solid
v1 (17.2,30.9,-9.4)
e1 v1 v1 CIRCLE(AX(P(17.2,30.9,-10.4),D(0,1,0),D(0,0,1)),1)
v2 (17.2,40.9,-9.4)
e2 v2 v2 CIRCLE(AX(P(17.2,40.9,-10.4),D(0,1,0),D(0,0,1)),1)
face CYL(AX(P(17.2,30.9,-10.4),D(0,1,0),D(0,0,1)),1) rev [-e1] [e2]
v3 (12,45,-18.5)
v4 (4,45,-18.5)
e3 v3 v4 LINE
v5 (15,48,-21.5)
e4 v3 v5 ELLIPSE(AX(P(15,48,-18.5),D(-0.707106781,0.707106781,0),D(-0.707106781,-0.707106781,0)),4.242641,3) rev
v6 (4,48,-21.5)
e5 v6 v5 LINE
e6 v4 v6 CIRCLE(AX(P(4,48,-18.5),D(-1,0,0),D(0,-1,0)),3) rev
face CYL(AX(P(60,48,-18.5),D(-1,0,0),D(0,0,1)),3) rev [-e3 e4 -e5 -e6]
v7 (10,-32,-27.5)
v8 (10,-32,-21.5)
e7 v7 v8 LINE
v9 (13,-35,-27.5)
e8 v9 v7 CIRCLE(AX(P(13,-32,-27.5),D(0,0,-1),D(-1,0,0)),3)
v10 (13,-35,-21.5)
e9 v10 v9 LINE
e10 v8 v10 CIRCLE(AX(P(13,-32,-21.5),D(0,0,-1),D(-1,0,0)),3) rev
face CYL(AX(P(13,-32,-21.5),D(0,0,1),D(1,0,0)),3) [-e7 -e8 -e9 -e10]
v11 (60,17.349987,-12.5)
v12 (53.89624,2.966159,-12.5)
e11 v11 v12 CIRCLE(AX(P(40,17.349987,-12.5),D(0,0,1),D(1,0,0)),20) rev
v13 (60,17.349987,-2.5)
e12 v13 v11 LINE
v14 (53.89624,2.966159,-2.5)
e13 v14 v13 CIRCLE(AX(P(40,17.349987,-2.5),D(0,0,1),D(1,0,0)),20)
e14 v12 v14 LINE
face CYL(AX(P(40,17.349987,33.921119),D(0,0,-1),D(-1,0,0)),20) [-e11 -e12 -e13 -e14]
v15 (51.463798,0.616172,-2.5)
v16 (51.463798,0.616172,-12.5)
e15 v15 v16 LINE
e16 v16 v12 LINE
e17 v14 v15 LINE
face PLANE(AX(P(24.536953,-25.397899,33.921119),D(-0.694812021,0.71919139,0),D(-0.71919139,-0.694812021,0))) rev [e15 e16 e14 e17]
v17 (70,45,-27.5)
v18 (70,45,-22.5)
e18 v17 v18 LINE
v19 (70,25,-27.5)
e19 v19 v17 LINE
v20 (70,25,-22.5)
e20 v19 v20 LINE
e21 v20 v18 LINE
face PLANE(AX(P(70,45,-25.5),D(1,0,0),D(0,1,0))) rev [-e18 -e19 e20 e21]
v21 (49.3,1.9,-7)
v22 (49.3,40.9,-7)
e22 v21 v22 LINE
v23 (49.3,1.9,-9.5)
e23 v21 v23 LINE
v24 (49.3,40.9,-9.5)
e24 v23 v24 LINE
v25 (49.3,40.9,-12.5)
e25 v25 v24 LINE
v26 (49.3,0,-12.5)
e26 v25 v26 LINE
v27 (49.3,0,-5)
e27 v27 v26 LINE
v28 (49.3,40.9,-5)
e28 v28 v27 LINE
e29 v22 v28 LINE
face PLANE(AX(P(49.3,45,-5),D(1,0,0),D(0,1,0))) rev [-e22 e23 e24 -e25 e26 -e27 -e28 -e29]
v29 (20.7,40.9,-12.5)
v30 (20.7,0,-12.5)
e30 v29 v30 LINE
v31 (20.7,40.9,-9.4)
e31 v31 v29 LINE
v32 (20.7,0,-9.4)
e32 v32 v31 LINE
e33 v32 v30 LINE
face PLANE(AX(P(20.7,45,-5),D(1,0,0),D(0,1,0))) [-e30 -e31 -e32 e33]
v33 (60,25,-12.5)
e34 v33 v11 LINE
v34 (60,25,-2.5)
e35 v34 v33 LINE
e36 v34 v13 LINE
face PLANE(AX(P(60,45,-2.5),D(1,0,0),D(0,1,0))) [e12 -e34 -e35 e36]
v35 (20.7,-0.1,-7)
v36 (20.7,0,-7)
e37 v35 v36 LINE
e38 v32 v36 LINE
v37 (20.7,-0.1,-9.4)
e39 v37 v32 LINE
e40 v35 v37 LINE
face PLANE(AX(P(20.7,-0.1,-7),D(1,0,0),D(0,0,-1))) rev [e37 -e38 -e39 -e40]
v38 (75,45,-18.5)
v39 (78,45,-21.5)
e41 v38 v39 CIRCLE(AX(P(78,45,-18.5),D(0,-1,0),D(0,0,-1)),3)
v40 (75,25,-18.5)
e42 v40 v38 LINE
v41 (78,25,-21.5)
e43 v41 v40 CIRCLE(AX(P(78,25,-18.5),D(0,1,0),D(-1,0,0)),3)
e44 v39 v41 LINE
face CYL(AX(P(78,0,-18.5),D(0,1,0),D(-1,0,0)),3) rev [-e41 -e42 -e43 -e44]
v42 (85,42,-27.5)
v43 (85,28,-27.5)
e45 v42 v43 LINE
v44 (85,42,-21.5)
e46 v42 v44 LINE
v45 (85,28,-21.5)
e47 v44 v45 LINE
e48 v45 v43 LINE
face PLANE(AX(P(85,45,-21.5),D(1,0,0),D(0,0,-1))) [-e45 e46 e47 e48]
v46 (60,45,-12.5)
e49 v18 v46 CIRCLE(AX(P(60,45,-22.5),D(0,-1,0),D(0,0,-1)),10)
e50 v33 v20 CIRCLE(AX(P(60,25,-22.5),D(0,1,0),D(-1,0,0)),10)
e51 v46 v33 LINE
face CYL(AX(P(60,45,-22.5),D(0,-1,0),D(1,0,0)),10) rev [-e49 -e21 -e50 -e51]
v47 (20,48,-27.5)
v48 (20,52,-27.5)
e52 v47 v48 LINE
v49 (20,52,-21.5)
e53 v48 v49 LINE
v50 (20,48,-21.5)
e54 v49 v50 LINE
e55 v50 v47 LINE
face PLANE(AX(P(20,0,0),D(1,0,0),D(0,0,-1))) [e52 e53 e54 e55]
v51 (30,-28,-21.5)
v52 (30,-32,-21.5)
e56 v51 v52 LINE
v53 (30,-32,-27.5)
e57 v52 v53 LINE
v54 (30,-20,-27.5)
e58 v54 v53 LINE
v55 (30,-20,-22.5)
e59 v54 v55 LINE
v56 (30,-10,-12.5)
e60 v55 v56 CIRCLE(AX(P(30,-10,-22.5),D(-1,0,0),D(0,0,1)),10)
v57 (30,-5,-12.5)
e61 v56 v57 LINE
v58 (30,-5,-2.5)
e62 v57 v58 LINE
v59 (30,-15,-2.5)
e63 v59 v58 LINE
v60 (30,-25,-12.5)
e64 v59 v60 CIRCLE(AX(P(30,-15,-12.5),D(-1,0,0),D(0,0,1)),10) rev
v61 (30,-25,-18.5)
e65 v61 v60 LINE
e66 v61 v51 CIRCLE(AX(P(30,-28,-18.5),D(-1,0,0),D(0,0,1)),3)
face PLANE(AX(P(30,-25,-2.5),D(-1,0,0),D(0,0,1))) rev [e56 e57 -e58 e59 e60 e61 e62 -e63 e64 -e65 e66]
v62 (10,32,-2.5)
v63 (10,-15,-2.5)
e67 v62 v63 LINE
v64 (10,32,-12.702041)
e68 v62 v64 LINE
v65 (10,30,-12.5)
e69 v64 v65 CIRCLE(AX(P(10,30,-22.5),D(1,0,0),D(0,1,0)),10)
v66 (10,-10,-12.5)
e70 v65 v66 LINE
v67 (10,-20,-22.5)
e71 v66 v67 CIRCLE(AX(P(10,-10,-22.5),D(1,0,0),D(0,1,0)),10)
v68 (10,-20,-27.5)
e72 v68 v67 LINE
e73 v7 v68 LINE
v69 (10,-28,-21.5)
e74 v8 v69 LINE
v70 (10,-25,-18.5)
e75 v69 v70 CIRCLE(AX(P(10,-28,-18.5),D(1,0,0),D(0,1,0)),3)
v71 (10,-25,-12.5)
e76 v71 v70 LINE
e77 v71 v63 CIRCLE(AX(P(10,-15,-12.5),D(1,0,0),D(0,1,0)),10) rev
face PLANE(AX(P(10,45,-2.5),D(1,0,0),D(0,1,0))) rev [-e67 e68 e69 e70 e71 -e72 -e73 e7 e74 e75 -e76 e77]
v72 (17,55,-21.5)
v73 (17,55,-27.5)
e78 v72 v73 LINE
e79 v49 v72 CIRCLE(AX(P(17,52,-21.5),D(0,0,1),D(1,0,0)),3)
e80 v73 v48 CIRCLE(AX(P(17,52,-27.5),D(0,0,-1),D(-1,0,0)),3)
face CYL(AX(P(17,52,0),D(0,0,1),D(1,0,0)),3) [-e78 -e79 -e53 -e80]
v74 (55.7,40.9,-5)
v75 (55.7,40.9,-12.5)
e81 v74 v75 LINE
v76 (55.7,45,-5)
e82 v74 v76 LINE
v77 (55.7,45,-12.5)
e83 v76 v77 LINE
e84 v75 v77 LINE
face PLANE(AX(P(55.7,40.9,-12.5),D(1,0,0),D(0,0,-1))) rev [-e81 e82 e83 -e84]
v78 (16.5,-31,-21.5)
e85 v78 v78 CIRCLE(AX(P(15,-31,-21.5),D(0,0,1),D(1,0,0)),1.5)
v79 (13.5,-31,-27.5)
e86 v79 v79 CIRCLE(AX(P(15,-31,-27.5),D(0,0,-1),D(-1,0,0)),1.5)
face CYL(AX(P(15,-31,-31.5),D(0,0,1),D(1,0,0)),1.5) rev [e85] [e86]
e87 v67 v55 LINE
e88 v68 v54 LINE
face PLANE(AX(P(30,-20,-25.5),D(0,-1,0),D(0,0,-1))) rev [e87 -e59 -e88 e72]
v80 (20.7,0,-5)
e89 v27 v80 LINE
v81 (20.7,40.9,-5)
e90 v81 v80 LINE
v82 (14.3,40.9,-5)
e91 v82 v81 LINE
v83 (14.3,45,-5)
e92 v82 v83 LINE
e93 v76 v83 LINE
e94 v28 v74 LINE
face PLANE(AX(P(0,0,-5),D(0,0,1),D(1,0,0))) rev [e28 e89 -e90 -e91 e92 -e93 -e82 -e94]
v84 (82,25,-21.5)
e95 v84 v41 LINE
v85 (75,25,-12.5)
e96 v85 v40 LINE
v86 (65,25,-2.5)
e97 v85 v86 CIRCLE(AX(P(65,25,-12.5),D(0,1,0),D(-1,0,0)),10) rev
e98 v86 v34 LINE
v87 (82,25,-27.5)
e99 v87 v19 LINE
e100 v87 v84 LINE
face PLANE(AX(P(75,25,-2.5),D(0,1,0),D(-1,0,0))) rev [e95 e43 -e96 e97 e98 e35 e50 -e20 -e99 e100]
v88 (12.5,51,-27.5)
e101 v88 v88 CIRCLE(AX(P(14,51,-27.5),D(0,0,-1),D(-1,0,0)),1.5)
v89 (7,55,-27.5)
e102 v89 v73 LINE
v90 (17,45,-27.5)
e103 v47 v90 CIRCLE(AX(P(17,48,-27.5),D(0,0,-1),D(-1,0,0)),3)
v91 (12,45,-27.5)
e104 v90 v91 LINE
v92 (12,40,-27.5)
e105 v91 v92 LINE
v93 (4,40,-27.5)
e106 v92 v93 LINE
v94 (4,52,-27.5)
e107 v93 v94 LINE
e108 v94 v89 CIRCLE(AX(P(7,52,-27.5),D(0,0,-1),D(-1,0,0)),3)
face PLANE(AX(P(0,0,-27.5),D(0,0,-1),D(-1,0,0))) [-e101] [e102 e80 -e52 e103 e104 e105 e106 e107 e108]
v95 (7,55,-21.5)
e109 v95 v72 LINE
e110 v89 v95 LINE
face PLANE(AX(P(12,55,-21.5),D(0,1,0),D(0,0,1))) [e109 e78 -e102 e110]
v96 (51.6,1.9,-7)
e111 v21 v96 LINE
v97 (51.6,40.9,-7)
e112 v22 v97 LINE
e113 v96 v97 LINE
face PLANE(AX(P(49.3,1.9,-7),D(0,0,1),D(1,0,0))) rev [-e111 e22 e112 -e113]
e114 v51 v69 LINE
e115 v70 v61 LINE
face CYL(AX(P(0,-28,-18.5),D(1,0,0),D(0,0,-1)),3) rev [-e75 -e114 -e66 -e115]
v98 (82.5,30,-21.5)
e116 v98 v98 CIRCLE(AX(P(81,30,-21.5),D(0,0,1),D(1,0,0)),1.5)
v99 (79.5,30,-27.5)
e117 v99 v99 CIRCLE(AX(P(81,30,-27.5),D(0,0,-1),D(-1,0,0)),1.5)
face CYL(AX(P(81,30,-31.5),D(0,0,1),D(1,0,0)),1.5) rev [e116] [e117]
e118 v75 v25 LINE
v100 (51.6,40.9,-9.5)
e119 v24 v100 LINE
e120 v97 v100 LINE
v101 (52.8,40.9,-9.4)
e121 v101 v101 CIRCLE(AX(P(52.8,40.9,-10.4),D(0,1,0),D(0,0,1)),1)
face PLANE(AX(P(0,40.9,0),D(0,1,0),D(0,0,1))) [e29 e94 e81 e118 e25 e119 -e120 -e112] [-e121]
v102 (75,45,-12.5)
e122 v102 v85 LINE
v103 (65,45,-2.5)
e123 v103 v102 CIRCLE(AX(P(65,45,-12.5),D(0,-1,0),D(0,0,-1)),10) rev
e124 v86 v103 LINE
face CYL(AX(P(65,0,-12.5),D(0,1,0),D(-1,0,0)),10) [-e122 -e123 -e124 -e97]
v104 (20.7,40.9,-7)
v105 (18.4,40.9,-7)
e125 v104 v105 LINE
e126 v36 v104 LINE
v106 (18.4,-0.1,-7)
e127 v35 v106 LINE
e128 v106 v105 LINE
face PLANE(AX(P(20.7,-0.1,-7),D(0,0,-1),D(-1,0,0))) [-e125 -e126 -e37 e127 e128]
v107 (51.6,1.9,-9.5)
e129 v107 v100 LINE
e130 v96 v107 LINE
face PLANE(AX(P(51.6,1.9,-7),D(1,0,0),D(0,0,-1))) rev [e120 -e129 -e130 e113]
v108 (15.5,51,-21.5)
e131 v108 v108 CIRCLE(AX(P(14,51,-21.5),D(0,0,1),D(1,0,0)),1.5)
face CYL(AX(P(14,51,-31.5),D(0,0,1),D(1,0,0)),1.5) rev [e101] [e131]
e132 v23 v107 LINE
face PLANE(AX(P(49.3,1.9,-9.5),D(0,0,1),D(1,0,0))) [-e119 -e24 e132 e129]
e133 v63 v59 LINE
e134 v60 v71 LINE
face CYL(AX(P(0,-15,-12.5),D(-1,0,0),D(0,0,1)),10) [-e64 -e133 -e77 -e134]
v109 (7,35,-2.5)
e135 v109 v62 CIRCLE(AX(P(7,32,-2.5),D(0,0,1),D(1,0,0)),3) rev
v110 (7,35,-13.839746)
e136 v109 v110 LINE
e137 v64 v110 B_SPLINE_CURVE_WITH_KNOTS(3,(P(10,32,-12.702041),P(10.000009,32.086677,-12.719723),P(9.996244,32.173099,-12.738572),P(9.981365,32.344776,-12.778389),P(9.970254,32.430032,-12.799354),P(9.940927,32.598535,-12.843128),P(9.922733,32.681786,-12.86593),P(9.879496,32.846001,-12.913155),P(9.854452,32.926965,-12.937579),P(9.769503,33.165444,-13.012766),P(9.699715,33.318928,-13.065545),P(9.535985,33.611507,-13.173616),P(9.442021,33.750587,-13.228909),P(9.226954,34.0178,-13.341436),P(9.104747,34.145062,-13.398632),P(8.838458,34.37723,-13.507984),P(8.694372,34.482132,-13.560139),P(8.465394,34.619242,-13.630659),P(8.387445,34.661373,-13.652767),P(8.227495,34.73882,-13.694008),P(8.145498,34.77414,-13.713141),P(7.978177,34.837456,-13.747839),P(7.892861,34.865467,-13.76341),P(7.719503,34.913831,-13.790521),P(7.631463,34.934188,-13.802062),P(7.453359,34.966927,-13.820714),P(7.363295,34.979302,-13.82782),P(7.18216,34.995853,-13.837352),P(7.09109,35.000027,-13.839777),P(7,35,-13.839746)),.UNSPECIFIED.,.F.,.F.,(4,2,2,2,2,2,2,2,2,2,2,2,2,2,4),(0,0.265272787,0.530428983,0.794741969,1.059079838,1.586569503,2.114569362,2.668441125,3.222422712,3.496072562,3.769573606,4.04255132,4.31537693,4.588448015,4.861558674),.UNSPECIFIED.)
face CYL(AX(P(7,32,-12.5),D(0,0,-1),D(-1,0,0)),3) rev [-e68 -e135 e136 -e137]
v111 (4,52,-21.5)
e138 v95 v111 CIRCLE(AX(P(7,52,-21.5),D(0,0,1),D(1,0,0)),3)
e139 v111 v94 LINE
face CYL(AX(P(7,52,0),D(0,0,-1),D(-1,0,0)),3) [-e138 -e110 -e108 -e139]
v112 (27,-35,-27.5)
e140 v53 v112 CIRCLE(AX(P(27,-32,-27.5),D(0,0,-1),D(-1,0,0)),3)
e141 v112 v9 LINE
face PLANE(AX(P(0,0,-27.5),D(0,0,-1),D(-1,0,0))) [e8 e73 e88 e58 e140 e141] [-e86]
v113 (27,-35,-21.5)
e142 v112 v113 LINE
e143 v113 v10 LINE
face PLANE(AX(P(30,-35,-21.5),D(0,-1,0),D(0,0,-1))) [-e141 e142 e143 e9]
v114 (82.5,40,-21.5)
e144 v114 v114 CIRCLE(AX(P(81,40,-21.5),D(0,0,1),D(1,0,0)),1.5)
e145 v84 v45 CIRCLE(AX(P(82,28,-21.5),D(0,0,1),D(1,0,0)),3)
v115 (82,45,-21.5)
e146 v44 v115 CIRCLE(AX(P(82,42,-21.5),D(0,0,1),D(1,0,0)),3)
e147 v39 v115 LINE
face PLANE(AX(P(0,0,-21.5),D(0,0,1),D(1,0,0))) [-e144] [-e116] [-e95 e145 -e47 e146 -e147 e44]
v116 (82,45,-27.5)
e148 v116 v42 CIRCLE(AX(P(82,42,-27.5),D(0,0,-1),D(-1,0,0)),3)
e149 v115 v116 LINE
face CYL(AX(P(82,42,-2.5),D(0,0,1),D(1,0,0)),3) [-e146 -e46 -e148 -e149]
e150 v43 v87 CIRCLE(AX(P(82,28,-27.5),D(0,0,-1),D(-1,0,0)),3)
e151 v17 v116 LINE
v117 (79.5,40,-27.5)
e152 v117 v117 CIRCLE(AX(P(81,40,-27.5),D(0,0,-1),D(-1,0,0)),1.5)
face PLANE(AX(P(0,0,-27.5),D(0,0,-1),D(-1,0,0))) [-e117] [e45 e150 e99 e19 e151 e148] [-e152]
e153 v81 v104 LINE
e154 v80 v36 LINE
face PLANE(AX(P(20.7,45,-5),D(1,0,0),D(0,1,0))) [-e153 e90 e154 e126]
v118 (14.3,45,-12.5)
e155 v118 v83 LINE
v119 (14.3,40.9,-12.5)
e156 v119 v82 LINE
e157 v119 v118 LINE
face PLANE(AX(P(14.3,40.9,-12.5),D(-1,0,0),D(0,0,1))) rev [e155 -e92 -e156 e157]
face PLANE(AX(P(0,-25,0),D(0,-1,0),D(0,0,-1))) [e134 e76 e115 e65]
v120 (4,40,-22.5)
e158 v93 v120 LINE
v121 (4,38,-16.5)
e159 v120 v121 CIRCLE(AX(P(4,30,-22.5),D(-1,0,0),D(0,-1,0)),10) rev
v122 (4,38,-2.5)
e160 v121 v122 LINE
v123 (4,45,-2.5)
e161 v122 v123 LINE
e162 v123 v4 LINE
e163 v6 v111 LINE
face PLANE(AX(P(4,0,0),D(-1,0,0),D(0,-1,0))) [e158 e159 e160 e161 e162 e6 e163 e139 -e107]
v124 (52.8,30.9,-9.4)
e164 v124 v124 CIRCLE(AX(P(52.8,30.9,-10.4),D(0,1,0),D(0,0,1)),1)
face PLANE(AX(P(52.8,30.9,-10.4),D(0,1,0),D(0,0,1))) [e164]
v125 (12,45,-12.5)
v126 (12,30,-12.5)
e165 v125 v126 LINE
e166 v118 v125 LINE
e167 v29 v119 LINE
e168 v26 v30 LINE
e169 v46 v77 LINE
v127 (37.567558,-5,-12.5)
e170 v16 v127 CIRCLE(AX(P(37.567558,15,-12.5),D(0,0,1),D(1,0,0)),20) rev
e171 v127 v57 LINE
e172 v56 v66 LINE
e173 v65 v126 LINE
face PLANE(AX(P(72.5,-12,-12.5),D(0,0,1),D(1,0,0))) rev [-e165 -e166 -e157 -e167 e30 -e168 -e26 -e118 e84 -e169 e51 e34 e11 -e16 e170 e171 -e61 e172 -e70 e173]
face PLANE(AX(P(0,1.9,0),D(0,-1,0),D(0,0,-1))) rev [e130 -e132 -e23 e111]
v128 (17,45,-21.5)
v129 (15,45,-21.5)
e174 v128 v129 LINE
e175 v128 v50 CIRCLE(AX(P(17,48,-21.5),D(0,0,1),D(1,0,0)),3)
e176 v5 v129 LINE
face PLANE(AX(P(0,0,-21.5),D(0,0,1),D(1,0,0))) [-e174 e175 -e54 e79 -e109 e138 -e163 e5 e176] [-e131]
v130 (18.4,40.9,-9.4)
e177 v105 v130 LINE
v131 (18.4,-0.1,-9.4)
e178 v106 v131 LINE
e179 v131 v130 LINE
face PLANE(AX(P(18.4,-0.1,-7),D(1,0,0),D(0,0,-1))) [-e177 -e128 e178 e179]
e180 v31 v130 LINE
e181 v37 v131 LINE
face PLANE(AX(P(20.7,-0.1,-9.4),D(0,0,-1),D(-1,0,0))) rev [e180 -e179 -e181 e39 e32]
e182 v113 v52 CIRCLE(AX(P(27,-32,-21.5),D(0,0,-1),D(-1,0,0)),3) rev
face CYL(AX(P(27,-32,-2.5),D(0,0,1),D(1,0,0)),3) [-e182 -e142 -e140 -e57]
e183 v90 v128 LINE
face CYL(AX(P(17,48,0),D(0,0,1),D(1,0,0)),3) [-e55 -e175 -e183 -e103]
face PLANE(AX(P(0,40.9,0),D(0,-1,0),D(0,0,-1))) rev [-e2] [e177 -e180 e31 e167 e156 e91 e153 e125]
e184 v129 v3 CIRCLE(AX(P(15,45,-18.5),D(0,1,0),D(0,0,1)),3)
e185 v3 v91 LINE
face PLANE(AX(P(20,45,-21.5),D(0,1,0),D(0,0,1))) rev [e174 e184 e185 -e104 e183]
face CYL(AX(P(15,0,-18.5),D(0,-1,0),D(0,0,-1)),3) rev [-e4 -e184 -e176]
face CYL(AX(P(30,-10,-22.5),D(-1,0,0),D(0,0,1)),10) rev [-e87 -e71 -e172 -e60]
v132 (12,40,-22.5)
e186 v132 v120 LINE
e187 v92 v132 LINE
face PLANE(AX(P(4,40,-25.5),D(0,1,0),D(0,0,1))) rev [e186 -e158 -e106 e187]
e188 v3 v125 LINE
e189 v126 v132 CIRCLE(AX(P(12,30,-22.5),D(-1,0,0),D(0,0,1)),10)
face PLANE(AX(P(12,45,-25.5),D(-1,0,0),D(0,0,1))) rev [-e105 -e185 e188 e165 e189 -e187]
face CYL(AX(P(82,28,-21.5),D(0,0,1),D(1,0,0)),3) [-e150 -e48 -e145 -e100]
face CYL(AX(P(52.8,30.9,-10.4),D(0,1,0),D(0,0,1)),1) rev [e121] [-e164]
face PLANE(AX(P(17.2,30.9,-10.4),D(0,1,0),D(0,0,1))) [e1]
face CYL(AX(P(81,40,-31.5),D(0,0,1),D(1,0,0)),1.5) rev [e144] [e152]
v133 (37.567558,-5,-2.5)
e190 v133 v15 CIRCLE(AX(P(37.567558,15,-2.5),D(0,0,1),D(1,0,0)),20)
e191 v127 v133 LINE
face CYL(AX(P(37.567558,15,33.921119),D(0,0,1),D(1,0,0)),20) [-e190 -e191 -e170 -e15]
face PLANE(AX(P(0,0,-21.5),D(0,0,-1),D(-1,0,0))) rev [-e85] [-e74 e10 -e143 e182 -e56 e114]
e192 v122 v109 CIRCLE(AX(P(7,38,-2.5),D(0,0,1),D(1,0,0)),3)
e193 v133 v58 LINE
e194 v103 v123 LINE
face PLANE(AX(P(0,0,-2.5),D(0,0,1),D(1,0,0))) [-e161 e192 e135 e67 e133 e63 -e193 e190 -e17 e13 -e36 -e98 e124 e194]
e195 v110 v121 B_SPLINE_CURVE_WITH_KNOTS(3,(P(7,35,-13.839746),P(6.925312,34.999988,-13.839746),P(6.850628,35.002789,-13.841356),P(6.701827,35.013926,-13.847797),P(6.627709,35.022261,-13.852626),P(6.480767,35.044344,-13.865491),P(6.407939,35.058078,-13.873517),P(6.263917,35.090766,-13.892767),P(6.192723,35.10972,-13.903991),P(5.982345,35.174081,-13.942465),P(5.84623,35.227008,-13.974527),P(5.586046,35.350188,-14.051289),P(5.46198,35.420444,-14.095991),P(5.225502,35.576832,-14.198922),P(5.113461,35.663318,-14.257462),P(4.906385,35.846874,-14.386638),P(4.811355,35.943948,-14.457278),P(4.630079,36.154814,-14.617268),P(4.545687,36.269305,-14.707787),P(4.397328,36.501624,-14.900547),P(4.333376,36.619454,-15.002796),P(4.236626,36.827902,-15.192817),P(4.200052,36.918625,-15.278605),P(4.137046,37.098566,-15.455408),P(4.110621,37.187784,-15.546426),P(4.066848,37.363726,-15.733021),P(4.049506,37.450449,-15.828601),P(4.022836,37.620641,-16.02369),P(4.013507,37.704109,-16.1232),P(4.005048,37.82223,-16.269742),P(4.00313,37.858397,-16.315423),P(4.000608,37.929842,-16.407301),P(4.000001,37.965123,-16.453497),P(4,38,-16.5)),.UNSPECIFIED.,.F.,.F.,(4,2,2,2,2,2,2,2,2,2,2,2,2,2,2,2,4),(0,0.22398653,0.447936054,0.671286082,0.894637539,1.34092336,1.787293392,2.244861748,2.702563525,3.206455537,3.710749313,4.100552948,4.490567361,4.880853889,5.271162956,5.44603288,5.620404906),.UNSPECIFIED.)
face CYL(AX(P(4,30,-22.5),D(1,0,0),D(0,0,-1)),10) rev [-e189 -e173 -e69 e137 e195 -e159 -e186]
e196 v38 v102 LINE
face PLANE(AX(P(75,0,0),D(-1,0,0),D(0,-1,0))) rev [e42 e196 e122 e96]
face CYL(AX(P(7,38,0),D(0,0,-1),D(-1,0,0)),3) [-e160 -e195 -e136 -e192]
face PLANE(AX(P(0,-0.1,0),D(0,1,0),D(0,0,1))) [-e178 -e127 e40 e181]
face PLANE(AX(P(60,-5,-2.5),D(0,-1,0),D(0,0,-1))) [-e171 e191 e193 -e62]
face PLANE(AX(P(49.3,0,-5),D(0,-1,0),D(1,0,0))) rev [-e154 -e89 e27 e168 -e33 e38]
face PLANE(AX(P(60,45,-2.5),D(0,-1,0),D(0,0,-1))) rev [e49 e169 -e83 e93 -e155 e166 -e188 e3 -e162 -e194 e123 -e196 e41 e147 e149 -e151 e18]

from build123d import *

# Parameters (mm, degrees)
SKETCH1_W                = 10
SKETCH1_H                = 20
BOSS_EXTRUDE2_DEPTH      = 10
SKETCH3_W                = 10
SKETCH3_H                = 20
BOSS_EXTRUDE3_DEPTH      = 10
SKETCH4_W                = 62.5
SKETCH4_H                = 5
BOSS_EXTRUDE4_DEPTH      = 10
SKETCH6_R                = 1
CUT_EXTRUDE1_DEPTH       = 10
CUT_EXTRUDE3_START       = -10
SKETCH10_R               = 1
CUT_EXTRUDE3_DEPTH       = 10
SKETCH11_W               = 50
SKETCH11_H               = 50
BOSS_EXTRUDE8_DEPTH      = 10
SKETCH18_W               = 10
SKETCH18_H               = 10
BOSS_EXTRUDE9_DEPTH      = 6
SKETCH20_W               = 10
SKETCH20_H               = 10
BOSS_EXTRUDE10_DEPTH     = 12
SKETCH23_W               = 28.6
SKETCH23_H               = 45
CUT_EXTRUDE10_DEPTH      = 7.5
SKETCH24_W               = 6.4
SKETCH24_H               = 7.5
CUT_EXTRUDE11_DEPTH      = 4.1
SKETCH25_W               = 2.3
SKETCH25_H               = 2.5
CUT_EXTRUDE12_DEPTH      = 39
SKETCH26_W               = 2.3
SKETCH26_H               = 2.4
CUT_EXTRUDE13_DEPTH      = 41
SKETCH27_R               = 1
CUT_EXTRUDE14_DEPTH      = 10
SKETCH28_R               = 1
CUT_EXTRUDE15_DEPTH      = 10
SKETCH31_W               = 12.5
SKETCH31_H               = 10
BOSS_EXTRUDE11_DEPTH     = 5
SKETCH32_W               = 10
SKETCH32_H               = 10
CUT_EXTRUDE16_DEPTH      = 7.5
CUT_EXTRUDE17_DEPTH      = 7.5
SKETCH33_W               = 10
SKETCH33_H               = 10
BOSS_EXTRUDE12_DEPTH     = 5
SKETCH34_W               = 10
SKETCH34_H               = 10
BOSS_EXTRUDE13_DEPTH     = 5
SKETCH35_W               = 10
SKETCH35_H               = 10
BOSS_EXTRUDE14_DEPTH     = 3.5
SKETCH36_W               = 10
SKETCH36_H               = 10
BOSS_EXTRUDE15_DEPTH     = 9.5
CUT_EXTRUDE18_DEPTH      = 90.5
CUT_EXTRUDE18_DEPTH_BACK = 15.5
SKETCH37_R               = 1.25
CUT_EXTRUDE19_DEPTH      = 88.5
CUT_EXTRUDE19_DEPTH_BACK = 15.5
SKETCH38_R               = 1.25
SKETCH39_W               = 29.967126749
SKETCH39_H               = 31.835751001
SKETCH39_W_2             = 15.617210398
SKETCH39_H_2             = 32.298255859
CUT_EXTRUDE20_DEPTH      = 36
SKETCH40_W               = 10
SKETCH40_H               = 10
BOSS_EXTRUDE16_DEPTH     = 6
SKETCH41_W               = 20
SKETCH41_H               = 10
BOSS_EXTRUDE17_DEPTH     = 20
SKETCH43_W               = 10
SKETCH43_H               = 20
BOSS_EXTRUDE18_DEPTH     = 15
SKETCH44_W               = 5
SKETCH44_H               = 20
SKETCH44_W_2             = 20
SKETCH44_H_2             = 5
SKETCH44_W_3             = 8
BOSS_EXTRUDE19_DEPTH     = 13
SKETCH45_W               = 15
SKETCH45_H               = 20
SKETCH45_W_2             = 20
SKETCH45_H_2             = 15
SKETCH45_W_3             = 8
BOSS_EXTRUDE20_DEPTH     = 4
SKETCH49_W               = 8
SKETCH49_H               = 15
SKETCH49_W_2             = 20
SKETCH49_W_3             = 15
SKETCH49_H_2             = 20
BOSS_EXTRUDE21_DEPTH     = 2
SKETCH47_R               = 1.5
CUT_EXTRUDE22_DEPTH      = 10
FILLET1_R                = 3
FILLET2_R                = 10
CUT_EXTRUDE23_DEPTH      = 10
FILLET3_R                = 20
FILLET7_R                = 3
FILLET8_R                = 3
SKETCH50_W               = 6
SKETCH50_H               = 10
BOSS_EXTRUDE22_DEPTH     = 8
SKETCH46_R               = 1.5
CUT_EXTRUDE21_DEPTH      = 10
FILLET10_R               = 3


with BuildPart() as part:
    # Sketch1 → Boss-Extrude2 (new body)
    with BuildSketch(Plane(origin=(0, 0, 0), x_dir=(1, 0, 0), z_dir=(0, 1, 0))):
        with Locations((5, 10)):
            Rectangle(SKETCH1_W, SKETCH1_H)
    extrude(amount=BOSS_EXTRUDE2_DEPTH)



with BuildPart() as body_2:
    # Sketch3 → Boss-Extrude3 (new body)
    with BuildSketch(Plane(origin=(0, 0, 0), x_dir=(1, 0, 0), z_dir=(0, 1, 0))):
        with Locations((77.5, 10)):
            Rectangle(SKETCH3_W, SKETCH3_H)
    extrude(amount=BOSS_EXTRUDE3_DEPTH)


with BuildPart() as part_1:
    add(part.part)

    add(body_2.part)  # Boss-Extrude4 merges body 2
    # Sketch4 → Boss-Extrude4 (add)
    with BuildSketch(Plane(origin=(0, 0, 0), x_dir=(1, 0, 0), z_dir=(0, 1, 0))):
        with Locations((41.25, 10)):
            Rectangle(SKETCH4_W, SKETCH4_H)
    extrude(amount=BOSS_EXTRUDE4_DEPTH)

    # Sketch6 → Cut-Extrude1 (cut)
    with BuildSketch(Plane(origin=(10, 0, 0), x_dir=(0, 0, -1), z_dir=(1, 0, 0))):
        with Locations((16.25, 5)):
            Circle(SKETCH6_R)
    extrude(amount=-CUT_EXTRUDE1_DEPTH, mode=Mode.SUBTRACT)

    # Sketch10 → Cut-Extrude3 (cut)
    with BuildSketch(Plane.ZY.offset(-72.5).offset(CUT_EXTRUDE3_START)):
        with Locations(Location((-16.25, 5, 0), (0, 0, 180))):
            Circle(SKETCH10_R)
    extrude(amount=CUT_EXTRUDE3_DEPTH, mode=Mode.SUBTRACT)

    # Sketch11 → Boss-Extrude8 (add)
    with BuildSketch(Plane(origin=(0, 0, -12.5), x_dir=(-1, 0, 0), z_dir=(0, 0, -1))):
        with Locations((-35, 20)):
            Rectangle(SKETCH11_W, SKETCH11_H)
    extrude(amount=-BOSS_EXTRUDE8_DEPTH)

    # Sketch18 → Boss-Extrude9 (add)
    with BuildSketch(Plane.XY):
        with Locations((5, 5)):
            Rectangle(SKETCH18_W, SKETCH18_H)
    extrude(amount=BOSS_EXTRUDE9_DEPTH)

    # Sketch20 → Boss-Extrude10 (add)
    with BuildSketch(Plane.XZ):
        with Locations((77.5, -7.5)):
            Rectangle(SKETCH20_W, SKETCH20_H)
        with Locations((5, -7.5)):
            Rectangle(SKETCH20_W, SKETCH20_H)
    extrude(amount=BOSS_EXTRUDE10_DEPTH)

    # Sketch23 → Cut-Extrude10 (cut)
    with BuildSketch(Plane(origin=(0, 0, -12.5), x_dir=(-1, 0, 0), z_dir=(0, 0, -1))):
        with Locations((-35, 22.5)):
            Rectangle(SKETCH23_W, SKETCH23_H)
    extrude(amount=-CUT_EXTRUDE10_DEPTH, mode=Mode.SUBTRACT)

    # Sketch24 → Cut-Extrude11 (cut)
    with BuildSketch(Plane(origin=(0, 45, 0), x_dir=(1, 0, 0), z_dir=(0, 1, 0))):
        with Locations((17.5, 8.75)):
            Rectangle(SKETCH24_W, SKETCH24_H)
        with Locations((52.5, 8.75)):
            Rectangle(SKETCH24_W, SKETCH24_H)
    extrude(amount=-CUT_EXTRUDE11_DEPTH, mode=Mode.SUBTRACT)

    # Sketch25 → Cut-Extrude12 (cut)
    with BuildSketch(Plane(origin=(0, 40.9, 0), x_dir=(1, 0, 0), z_dir=(0, 1, 0))):
        with Locations((50.45, 8.25)):
            Rectangle(SKETCH25_W, SKETCH25_H)
    extrude(amount=-CUT_EXTRUDE12_DEPTH, mode=Mode.SUBTRACT)

    # Sketch26 → Cut-Extrude13 (cut)
    with BuildSketch(Plane(origin=(0, 40.9, 0), x_dir=(1, 0, 0), z_dir=(0, 1, 0))):
        with Locations((19.55, 8.2)):
            Rectangle(SKETCH26_W, SKETCH26_H)
    extrude(amount=-CUT_EXTRUDE13_DEPTH, mode=Mode.SUBTRACT)

    # Sketch27 → Cut-Extrude14 (cut)
    with BuildSketch(Plane(origin=(0, 40.9, 0), x_dir=(1, 0, 0), z_dir=(0, 1, 0))):
        with Locations(Location((17.2, 10.4, 0), (0, 0, 270))):
            Circle(SKETCH27_R)
    extrude(amount=-CUT_EXTRUDE14_DEPTH, mode=Mode.SUBTRACT)

    # Sketch28 → Cut-Extrude15 (cut)
    with BuildSketch(Plane(origin=(0, 40.9, 0), x_dir=(1, 0, 0), z_dir=(0, 1, 0))):
        with Locations(Location((52.8, 10.4, 0), (0, 0, 270))):
            Circle(SKETCH28_R)
    extrude(amount=-CUT_EXTRUDE15_DEPTH, mode=Mode.SUBTRACT)

    # Sketch31 → Boss-Extrude11 (add)
    with BuildSketch(Plane.XY.offset(-7.5)):
        with Locations((66.25, 5)):
            Rectangle(SKETCH31_W, SKETCH31_H)
    extrude(amount=BOSS_EXTRUDE11_DEPTH)

    # Sketch32 → Cut-Extrude16 (cut)
    with BuildSketch(Plane(origin=(0, 0, -20), x_dir=(-1, 0, 0), z_dir=(0, 0, -1))):
        with Locations((-77.5, 5)):
            Rectangle(SKETCH32_W, SKETCH32_H)
    extrude(amount=-CUT_EXTRUDE16_DEPTH, mode=Mode.SUBTRACT)

    # 3DSketch1 → Cut-Extrude17 (cut)
    with BuildSketch(Plane(origin=(10, 0, -20), x_dir=(-0.7071067811865476, 0.7071067811865476, 0), z_dir=(0, 0, 1))):
        Polygon((0, 0), (7.071067812, 7.071067812), (14.142135624, 0), (7.071067812, -7.071067812), align=None)
    extrude(amount=CUT_EXTRUDE17_DEPTH, mode=Mode.SUBTRACT)

    # Sketch33 → Boss-Extrude12 (add)
    with BuildSketch(Plane.XZ.offset(12)):
        with Locations((5, -7.5)):
            Rectangle(SKETCH33_W, SKETCH33_H)
    extrude(amount=BOSS_EXTRUDE12_DEPTH)

    # Sketch34 → Boss-Extrude13 (add)
    with BuildSketch(Plane.XZ.offset(12)):
        with Locations((77.5, -7.5)):
            Rectangle(SKETCH34_W, SKETCH34_H)
    extrude(amount=BOSS_EXTRUDE13_DEPTH)

    # Sketch35 → Boss-Extrude14 (add)
    with BuildSketch(Plane.XY.offset(6)):
        with Locations((5, 5)):
            Rectangle(SKETCH35_W, SKETCH35_H)
    extrude(amount=BOSS_EXTRUDE14_DEPTH)

    # Sketch36 → Boss-Extrude15 (add)
    with BuildSketch(Plane.XY):
        with Locations((77.5, 5)):
            Rectangle(SKETCH36_W, SKETCH36_H)
    extrude(amount=BOSS_EXTRUDE15_DEPTH)

    # Sketch37 → Cut-Extrude18 (cut, two sides: drawn at the far end of the back side and taken through both)
    with BuildSketch(Plane(origin=(10, 0, 0), x_dir=(0, 0, -1), z_dir=(1, 0, 0)).offset(-CUT_EXTRUDE18_DEPTH_BACK)):
        with Locations(Location((-3.5, 5, 0), (0, 0, 180))):
            Circle(SKETCH37_R)
    extrude(amount=CUT_EXTRUDE18_DEPTH + CUT_EXTRUDE18_DEPTH_BACK, mode=Mode.SUBTRACT)

    # Sketch38 → Cut-Extrude19 (cut, two sides: drawn at the far end of the back side and taken through both)
    with BuildSketch(Plane(origin=(10, 0, 0), x_dir=(0, 0, -1), z_dir=(1, 0, 0)).offset(-CUT_EXTRUDE19_DEPTH_BACK)):
        with Locations(Location((7.5, -11, 0), (0, 0, 180))):
            Circle(SKETCH38_R)
    extrude(amount=CUT_EXTRUDE19_DEPTH + CUT_EXTRUDE19_DEPTH_BACK, mode=Mode.SUBTRACT)

    # Sketch39 → Cut-Extrude20 (cut)
    with BuildSketch(Plane(origin=(0, 0, -12.5), x_dir=(-1, 0, 0), z_dir=(0, 0, -1))):
        with Locations((-74.983563375, -4.30748393)):
            Rectangle(SKETCH39_W, SKETCH39_H)
        with Locations((-2.191394801, -3.536642501)):
            Rectangle(SKETCH39_W_2, SKETCH39_H_2)
    extrude(amount=-CUT_EXTRUDE20_DEPTH, mode=Mode.SUBTRACT)

    # Sketch40 → Boss-Extrude16 (add)
    with BuildSketch(Plane.ZY.offset(-10)):
        with Locations((-7.5, 40)):
            Rectangle(SKETCH40_W, SKETCH40_H)
    extrude(amount=BOSS_EXTRUDE16_DEPTH)

    # Sketch41 → Boss-Extrude17 (add)
    with BuildSketch(Plane.XZ.offset(5)):
        with Locations((20, -7.5)):
            Rectangle(SKETCH41_W, SKETCH41_H)
    extrude(amount=BOSS_EXTRUDE17_DEPTH)

    # Sketch43 → Boss-Extrude18 (add)
    with BuildSketch(Plane(origin=(60, 0, 0), x_dir=(0, 0, -1), z_dir=(1, 0, 0))):
        with Locations((7.5, 35)):
            Rectangle(SKETCH43_W, SKETCH43_H)
    extrude(amount=BOSS_EXTRUDE18_DEPTH)

    # Sketch44 → Boss-Extrude19 (add)
    with BuildSketch(Plane(origin=(0, 0, -12.5), x_dir=(-1, 0, 0), z_dir=(0, 0, -1))):
        with Locations((-72.5, 35)):
            Rectangle(SKETCH44_W, SKETCH44_H)
        with Locations((-20, -22.5)):
            Rectangle(SKETCH44_W_2, SKETCH44_H_2)
        with Locations((-8, 42.5)):
            Rectangle(SKETCH44_W_3, SKETCH44_H_2)
    extrude(amount=BOSS_EXTRUDE19_DEPTH)

    # Sketch45 → Boss-Extrude20 (add)
    with BuildSketch(Plane(origin=(0, 0, -25.5), x_dir=(-1, 0, 0), z_dir=(0, 0, -1))):
        with Locations((-77.5, 35)):
            Rectangle(SKETCH45_W, SKETCH45_H)
        with Locations((-20, -27.5)):
            Rectangle(SKETCH45_W_2, SKETCH45_H_2)
        with Locations((-8, 47.5)):
            Rectangle(SKETCH45_W_3, SKETCH45_H_2)
    extrude(amount=-BOSS_EXTRUDE20_DEPTH)

    # Sketch49 → Boss-Extrude21 (add)
    with BuildSketch(Plane(origin=(0, 0, -25.5), x_dir=(-1, 0, 0), z_dir=(0, 0, -1))):
        with Locations((-8, 47.5)):
            Rectangle(SKETCH49_W, SKETCH49_H)
        with Locations((-20, -27.5)):
            Rectangle(SKETCH49_W_2, SKETCH49_H)
        with Locations((-77.5, 35)):
            Rectangle(SKETCH49_W_3, SKETCH49_H_2)
    extrude(amount=BOSS_EXTRUDE21_DEPTH)

    # Sketch47 → Cut-Extrude22 (cut)
    with BuildSketch(Plane.XY.offset(-21.5)):
        with Locations((15, -31)):
            Circle(SKETCH47_R)
        with Locations((81, 30)):
            Circle(SKETCH47_R)
        with Locations((81, 40)):
            Circle(SKETCH47_R)
    extrude(amount=-CUT_EXTRUDE22_DEPTH, mode=Mode.SUBTRACT)

    # Fillet1
    fillet1_edges = [part_1.edges().sort_by_distance(p)[0] for p in [
        (20, -25, -21.5),
        (8, 45, -21.5),
        (75, 35, -21.5),
    ]]
    fillet(fillet1_edges, radius=FILLET1_R)

    # Fillet2
    fillet2_edges = [part_1.edges().sort_by_distance(p)[0] for p in [
        (8, 40, -12.5),
        (20, -20, -12.5),
        (20, -25, -2.5),
        (75, 35, -2.5),
        (70, 35, -12.5),
    ]]
    fillet(fillet2_edges, radius=FILLET2_R)

    # Sketch48 → Cut-Extrude23 (cut)
    with BuildSketch(Plane(origin=(0, 0, -12.5), x_dir=(-1, 0, 0), z_dir=(0, 0, -1))):
        Polygon((-41.126439375, -9.370767462), (-66.809029943, 15.441226815), (-67.788450769, -8.064873027), align=None)
    extrude(amount=-CUT_EXTRUDE23_DEPTH, mode=Mode.SUBTRACT)

    # Fillet3
    fillet3_edges = [part_1.edges().sort_by_distance(p)[0] for p in [
        (60, 8.863011447, -7.5),
        (45.650567099, -5, -7.5),
    ]]
    fillet(fillet3_edges, radius=FILLET3_R)

    # Fillet7
    fillet7_edges = [part_1.edges().sort_by_distance(p)[0] for p in [
        (10, 35, -8.169872981),
        (4, 35, -8.169872981),
    ]]
    fillet(fillet7_edges, radius=FILLET7_R - 0.0001)  # a hair under: the kernel refuses the full size

    # Fillet8
    fillet8_edges = [part_1.edges().sort_by_distance(p)[0] for p in [
        (85, 45, -24.5),
        (85, 25, -24.5),
        (30, -35, -24.5),
        (10, -35, -24.5),
        (4, 55, -24.5),
    ]]
    fillet(fillet8_edges, radius=FILLET8_R)

    # Sketch50 → Boss-Extrude22 (add)
    with BuildSketch(Plane(origin=(12, 0, 0), x_dir=(0, 0, -1), z_dir=(1, 0, 0))):
        with Locations((24.5, 50)):
            Rectangle(SKETCH50_W, SKETCH50_H)
    extrude(amount=BOSS_EXTRUDE22_DEPTH)

    # Sketch46 → Cut-Extrude21 (cut)
    with BuildSketch(Plane.XY.offset(-21.5)):
        with Locations((14, 51)):
            Circle(SKETCH46_R)
    extrude(amount=-CUT_EXTRUDE21_DEPTH, mode=Mode.SUBTRACT)

    # Fillet10
    fillet10_edges = [part_1.edges().sort_by_distance(p)[0] for p in [
        (12, 46.5, -21.5),
        (20, 45, -24.5),
        (20, 55, -24.5),
    ]]
    fillet(fillet10_edges, radius=FILLET10_R - 0.0001)  # a hair under: the kernel refuses the full size


solid = part_1.part
